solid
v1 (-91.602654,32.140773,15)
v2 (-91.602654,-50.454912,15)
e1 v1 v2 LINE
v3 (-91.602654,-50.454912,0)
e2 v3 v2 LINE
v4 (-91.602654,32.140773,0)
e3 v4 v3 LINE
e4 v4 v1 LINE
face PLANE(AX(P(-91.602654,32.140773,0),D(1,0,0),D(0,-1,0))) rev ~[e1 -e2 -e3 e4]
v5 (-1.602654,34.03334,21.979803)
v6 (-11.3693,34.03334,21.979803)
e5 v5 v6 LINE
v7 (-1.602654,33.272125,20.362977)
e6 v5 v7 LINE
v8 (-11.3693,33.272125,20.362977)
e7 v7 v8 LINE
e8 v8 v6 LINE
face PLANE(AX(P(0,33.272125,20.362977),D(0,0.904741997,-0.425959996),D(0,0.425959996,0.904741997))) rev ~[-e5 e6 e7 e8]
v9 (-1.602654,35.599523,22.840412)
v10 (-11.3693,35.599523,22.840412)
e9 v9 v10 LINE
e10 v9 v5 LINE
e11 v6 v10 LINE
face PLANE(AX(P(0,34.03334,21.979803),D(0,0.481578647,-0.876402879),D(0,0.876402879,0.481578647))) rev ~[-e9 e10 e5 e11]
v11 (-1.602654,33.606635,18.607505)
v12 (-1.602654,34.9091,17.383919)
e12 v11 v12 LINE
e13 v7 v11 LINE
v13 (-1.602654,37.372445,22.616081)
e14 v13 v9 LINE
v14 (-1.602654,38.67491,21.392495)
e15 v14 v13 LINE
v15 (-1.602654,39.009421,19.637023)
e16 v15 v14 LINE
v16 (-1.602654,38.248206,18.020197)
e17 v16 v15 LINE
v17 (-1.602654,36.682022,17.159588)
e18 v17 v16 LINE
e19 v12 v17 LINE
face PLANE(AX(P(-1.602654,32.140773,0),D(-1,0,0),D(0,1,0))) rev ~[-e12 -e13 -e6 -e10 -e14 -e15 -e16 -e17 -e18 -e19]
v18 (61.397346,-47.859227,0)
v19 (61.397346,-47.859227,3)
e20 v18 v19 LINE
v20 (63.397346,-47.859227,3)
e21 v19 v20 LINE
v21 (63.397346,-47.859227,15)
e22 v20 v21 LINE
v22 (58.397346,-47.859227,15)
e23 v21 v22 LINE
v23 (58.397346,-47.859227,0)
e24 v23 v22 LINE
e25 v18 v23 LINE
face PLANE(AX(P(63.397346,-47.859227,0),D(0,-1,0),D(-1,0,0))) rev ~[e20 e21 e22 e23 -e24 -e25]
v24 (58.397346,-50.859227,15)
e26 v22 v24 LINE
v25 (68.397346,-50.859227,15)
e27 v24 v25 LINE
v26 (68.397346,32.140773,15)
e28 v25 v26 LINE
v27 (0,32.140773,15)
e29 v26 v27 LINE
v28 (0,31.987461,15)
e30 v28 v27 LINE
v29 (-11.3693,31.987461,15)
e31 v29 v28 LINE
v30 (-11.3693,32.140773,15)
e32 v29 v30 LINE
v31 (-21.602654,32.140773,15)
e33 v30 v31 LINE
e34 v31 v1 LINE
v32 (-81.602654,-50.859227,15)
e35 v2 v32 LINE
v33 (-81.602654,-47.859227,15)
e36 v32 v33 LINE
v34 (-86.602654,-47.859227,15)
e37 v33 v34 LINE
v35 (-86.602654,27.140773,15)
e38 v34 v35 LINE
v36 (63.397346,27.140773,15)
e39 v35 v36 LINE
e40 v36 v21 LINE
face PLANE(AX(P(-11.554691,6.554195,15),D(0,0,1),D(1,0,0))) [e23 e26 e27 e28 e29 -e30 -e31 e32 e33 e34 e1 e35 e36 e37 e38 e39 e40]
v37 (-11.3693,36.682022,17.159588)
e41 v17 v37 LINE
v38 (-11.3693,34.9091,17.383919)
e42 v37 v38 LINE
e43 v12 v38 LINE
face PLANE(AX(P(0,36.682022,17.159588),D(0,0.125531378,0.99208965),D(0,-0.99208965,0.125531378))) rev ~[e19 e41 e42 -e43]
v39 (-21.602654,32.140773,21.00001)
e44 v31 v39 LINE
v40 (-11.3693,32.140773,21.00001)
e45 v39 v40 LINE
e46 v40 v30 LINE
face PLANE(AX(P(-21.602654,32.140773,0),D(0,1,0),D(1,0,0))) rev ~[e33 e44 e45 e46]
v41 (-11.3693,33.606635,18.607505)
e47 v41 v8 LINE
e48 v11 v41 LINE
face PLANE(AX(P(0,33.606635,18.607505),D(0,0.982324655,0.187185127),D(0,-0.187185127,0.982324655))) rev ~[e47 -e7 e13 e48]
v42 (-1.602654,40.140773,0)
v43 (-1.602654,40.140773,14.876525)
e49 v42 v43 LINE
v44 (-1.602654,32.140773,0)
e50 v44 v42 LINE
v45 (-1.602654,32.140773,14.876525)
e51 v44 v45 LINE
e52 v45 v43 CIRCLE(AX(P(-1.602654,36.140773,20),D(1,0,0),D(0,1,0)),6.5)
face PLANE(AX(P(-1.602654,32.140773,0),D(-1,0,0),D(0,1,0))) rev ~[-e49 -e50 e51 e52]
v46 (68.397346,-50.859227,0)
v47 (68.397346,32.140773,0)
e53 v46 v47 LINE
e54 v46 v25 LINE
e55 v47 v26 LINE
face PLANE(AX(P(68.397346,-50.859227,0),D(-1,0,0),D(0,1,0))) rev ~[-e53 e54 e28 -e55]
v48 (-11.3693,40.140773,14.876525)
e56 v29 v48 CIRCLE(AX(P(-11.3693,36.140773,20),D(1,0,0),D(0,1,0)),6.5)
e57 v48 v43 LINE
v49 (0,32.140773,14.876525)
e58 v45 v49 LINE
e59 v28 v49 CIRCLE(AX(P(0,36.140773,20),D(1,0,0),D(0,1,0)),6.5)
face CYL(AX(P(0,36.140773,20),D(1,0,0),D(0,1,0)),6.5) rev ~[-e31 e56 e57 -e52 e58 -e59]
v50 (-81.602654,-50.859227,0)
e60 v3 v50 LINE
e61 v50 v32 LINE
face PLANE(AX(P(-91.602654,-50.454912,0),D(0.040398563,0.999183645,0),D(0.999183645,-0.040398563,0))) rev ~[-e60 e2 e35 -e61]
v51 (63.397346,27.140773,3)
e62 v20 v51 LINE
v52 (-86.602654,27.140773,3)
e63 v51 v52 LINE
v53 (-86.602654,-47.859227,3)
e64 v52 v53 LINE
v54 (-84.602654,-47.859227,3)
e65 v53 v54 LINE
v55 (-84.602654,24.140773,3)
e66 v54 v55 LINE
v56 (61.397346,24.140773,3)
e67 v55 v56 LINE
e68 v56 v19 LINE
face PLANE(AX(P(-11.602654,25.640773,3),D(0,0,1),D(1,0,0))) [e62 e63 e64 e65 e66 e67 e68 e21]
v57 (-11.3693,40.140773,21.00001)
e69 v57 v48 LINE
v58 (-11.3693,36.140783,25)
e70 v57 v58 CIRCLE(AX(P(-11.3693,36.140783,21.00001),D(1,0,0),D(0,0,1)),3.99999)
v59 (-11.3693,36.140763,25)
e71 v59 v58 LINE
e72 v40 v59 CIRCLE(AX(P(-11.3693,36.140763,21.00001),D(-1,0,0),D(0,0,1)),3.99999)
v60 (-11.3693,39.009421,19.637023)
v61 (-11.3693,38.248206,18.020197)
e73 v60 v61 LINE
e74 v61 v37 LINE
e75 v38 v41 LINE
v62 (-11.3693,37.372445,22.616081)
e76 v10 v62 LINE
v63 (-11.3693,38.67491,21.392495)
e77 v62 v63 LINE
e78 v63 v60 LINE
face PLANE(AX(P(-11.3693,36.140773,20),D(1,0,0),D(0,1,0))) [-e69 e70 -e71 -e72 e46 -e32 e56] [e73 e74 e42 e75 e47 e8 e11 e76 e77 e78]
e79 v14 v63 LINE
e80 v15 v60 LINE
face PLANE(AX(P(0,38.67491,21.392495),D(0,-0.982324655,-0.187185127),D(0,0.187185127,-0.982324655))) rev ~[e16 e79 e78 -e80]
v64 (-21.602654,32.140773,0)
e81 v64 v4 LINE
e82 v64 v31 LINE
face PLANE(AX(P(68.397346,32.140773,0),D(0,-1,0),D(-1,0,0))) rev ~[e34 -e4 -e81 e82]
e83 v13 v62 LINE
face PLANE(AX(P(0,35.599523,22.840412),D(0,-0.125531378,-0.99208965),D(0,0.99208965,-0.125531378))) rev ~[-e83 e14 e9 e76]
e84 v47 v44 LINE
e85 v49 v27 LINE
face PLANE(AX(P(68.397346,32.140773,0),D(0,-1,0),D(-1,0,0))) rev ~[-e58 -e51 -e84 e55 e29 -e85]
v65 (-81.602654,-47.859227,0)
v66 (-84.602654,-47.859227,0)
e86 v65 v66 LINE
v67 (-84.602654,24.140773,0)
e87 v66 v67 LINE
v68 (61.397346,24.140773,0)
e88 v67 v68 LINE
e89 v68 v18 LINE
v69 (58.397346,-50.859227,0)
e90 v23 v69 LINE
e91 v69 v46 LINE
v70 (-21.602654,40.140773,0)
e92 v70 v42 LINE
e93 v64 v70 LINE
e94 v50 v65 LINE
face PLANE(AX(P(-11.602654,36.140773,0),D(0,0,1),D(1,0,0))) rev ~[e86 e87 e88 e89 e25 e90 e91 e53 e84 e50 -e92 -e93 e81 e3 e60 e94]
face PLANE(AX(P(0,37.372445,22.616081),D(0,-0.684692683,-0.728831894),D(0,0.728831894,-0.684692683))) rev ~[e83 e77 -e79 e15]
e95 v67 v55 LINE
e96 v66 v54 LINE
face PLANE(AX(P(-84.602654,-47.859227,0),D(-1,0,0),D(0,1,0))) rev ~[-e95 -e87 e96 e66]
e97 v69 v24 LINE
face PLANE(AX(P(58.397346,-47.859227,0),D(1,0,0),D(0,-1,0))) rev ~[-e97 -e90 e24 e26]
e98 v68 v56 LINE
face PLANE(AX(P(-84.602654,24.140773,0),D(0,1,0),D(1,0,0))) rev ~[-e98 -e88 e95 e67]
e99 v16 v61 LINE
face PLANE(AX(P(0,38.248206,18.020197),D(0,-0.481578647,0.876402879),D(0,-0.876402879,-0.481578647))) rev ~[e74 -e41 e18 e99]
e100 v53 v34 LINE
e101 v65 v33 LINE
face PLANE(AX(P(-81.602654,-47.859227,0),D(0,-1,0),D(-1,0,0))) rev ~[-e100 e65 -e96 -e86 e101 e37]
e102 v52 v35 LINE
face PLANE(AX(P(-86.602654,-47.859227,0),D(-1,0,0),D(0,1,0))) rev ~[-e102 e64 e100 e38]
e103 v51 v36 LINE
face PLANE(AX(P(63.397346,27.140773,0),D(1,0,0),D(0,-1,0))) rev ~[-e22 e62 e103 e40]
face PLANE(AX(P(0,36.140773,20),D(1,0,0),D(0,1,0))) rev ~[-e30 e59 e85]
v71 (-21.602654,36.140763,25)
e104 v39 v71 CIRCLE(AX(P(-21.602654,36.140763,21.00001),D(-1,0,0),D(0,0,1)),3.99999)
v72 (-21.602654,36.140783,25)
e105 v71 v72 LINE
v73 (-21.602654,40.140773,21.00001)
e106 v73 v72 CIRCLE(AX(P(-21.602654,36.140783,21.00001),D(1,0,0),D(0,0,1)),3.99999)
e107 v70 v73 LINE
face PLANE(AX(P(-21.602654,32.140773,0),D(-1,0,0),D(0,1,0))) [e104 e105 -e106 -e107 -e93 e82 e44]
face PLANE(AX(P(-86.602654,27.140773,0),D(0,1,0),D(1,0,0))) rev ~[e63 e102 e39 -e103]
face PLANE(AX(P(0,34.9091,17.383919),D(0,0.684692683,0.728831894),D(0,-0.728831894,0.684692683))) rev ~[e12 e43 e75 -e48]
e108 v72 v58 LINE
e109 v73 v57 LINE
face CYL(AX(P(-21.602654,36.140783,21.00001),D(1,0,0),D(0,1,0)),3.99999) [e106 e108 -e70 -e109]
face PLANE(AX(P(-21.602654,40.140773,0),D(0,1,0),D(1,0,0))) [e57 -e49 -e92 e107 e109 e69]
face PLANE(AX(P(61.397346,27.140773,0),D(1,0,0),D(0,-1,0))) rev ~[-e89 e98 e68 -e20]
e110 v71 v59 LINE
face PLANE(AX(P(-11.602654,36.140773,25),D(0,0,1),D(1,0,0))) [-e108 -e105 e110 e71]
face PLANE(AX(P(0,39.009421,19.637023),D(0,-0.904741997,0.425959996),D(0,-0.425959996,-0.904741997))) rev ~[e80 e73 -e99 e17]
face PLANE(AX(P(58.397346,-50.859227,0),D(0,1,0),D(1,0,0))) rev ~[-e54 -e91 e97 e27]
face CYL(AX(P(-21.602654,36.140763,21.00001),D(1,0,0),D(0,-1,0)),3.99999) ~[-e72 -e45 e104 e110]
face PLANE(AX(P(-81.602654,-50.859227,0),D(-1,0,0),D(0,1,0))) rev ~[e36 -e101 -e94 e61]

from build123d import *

# Parameters (mm, degrees)
F1_DEPTH = 15
F2_DEPTH = 3
F0_W     = 146
F0_H     = 3
F3_DEPTH = 3
F0_W_2   = 20
F0_H_2   = 8
F4_DEPTH = 25
F5_R     = 6.5
F6_DEPTH = 11.3693
F7_R     = 3.99999


# Not quite as in the source:
# - a fillet or chamfer is up to 0.001 mm smaller than in the source, because OpenCascade refuses the exact size


with BuildPart() as f1:
    # F0 (on Top) → F1 (new body)
    with BuildSketch(Plane.XY):
        Polygon((-21.6026537657, 32.1407727134), (-91.6026537657, 32.1407727134), (-91.6026537657, -50.4549115884), (-81.6026537657, -50.8592272866), (-81.6026537657, -47.8592272866), (-84.6026537657, -47.8592272866), (-86.6026537657, -47.8592272866), (-86.6026537657, 27.1407727134), (-84.6026537657, 27.1407727134), (61.3973462343, 27.1407727134), (63.3973462343, 27.1407727134), (63.3973462343, -47.8592272866), (61.3973462343, -47.8592272866), (58.3973462343, -47.8592272866), (58.3973462343, -50.8592272866), (68.3973462343, -50.8592272866), (68.3973462343, 32.1407727134), (-1.6026537657, 32.1407727134), align=None)
    extrude(amount=F1_DEPTH)

    # F0 (on Top) → F2 (join)
    with BuildSketch(Plane.XY):
        Polygon((-86.6026537657, -47.8592272866), (-84.6026537657, -47.8592272866), (-84.6026537657, 24.1407727134), (-84.6026537657, 27.1407727134), (-86.6026537657, 27.1407727134), align=None)
        Polygon((61.3973462343, 27.1407727134), (61.3973462343, 24.1407727134), (61.3973462343, -47.8592272866), (63.3973462343, -47.8592272866), (63.3973462343, 27.1407727134), align=None)
    extrude(amount=F2_DEPTH)

    # F0 (on Top) → F3 (join)
    with BuildSketch(Plane.XY):
        with Locations((-11.6026537657, 25.6407727134)):
            Rectangle(F0_W, F0_H)
    extrude(amount=F3_DEPTH)

    # F0 (on Top) → F4 (join)
    with BuildSketch(Plane.XY):
        with Locations((-11.6026537657, 36.1407727134)):
            Rectangle(F0_W_2, F0_H_2)
    extrude(amount=F4_DEPTH)

    # F5 (on Right) → F6 (cut)
    with BuildSketch(Plane.YZ):
        with Locations((36.1407727134, 20)):
            Circle(F5_R)
        Polygon((33.2721245414, 20.362976629), (34.0333399009, 21.979803351), (35.5995229657, 22.8404124839), (37.3724450378, 22.61608059), (38.674910145, 21.3924948281), (39.0094208855, 19.637023371), (38.248205526, 18.020196649), (36.6820224612, 17.1595875161), (34.9091003891, 17.38391941), (33.6066352819, 18.6075051719), align=None, mode=Mode.SUBTRACT)
    extrude(amount=-F6_DEPTH, mode=Mode.SUBTRACT)

    # F7 (radius 4 in the source; OpenCascade refuses exactly that, so slightly less here)
    f7_edges = [f1.edges().sort_by_distance(p)[0] for p in [
        (-16.485977, 40.140773, 25),
        (-16.485977, 32.140773, 25),
    ]]
    fillet(f7_edges, radius=F7_R)


solid = f1.part
